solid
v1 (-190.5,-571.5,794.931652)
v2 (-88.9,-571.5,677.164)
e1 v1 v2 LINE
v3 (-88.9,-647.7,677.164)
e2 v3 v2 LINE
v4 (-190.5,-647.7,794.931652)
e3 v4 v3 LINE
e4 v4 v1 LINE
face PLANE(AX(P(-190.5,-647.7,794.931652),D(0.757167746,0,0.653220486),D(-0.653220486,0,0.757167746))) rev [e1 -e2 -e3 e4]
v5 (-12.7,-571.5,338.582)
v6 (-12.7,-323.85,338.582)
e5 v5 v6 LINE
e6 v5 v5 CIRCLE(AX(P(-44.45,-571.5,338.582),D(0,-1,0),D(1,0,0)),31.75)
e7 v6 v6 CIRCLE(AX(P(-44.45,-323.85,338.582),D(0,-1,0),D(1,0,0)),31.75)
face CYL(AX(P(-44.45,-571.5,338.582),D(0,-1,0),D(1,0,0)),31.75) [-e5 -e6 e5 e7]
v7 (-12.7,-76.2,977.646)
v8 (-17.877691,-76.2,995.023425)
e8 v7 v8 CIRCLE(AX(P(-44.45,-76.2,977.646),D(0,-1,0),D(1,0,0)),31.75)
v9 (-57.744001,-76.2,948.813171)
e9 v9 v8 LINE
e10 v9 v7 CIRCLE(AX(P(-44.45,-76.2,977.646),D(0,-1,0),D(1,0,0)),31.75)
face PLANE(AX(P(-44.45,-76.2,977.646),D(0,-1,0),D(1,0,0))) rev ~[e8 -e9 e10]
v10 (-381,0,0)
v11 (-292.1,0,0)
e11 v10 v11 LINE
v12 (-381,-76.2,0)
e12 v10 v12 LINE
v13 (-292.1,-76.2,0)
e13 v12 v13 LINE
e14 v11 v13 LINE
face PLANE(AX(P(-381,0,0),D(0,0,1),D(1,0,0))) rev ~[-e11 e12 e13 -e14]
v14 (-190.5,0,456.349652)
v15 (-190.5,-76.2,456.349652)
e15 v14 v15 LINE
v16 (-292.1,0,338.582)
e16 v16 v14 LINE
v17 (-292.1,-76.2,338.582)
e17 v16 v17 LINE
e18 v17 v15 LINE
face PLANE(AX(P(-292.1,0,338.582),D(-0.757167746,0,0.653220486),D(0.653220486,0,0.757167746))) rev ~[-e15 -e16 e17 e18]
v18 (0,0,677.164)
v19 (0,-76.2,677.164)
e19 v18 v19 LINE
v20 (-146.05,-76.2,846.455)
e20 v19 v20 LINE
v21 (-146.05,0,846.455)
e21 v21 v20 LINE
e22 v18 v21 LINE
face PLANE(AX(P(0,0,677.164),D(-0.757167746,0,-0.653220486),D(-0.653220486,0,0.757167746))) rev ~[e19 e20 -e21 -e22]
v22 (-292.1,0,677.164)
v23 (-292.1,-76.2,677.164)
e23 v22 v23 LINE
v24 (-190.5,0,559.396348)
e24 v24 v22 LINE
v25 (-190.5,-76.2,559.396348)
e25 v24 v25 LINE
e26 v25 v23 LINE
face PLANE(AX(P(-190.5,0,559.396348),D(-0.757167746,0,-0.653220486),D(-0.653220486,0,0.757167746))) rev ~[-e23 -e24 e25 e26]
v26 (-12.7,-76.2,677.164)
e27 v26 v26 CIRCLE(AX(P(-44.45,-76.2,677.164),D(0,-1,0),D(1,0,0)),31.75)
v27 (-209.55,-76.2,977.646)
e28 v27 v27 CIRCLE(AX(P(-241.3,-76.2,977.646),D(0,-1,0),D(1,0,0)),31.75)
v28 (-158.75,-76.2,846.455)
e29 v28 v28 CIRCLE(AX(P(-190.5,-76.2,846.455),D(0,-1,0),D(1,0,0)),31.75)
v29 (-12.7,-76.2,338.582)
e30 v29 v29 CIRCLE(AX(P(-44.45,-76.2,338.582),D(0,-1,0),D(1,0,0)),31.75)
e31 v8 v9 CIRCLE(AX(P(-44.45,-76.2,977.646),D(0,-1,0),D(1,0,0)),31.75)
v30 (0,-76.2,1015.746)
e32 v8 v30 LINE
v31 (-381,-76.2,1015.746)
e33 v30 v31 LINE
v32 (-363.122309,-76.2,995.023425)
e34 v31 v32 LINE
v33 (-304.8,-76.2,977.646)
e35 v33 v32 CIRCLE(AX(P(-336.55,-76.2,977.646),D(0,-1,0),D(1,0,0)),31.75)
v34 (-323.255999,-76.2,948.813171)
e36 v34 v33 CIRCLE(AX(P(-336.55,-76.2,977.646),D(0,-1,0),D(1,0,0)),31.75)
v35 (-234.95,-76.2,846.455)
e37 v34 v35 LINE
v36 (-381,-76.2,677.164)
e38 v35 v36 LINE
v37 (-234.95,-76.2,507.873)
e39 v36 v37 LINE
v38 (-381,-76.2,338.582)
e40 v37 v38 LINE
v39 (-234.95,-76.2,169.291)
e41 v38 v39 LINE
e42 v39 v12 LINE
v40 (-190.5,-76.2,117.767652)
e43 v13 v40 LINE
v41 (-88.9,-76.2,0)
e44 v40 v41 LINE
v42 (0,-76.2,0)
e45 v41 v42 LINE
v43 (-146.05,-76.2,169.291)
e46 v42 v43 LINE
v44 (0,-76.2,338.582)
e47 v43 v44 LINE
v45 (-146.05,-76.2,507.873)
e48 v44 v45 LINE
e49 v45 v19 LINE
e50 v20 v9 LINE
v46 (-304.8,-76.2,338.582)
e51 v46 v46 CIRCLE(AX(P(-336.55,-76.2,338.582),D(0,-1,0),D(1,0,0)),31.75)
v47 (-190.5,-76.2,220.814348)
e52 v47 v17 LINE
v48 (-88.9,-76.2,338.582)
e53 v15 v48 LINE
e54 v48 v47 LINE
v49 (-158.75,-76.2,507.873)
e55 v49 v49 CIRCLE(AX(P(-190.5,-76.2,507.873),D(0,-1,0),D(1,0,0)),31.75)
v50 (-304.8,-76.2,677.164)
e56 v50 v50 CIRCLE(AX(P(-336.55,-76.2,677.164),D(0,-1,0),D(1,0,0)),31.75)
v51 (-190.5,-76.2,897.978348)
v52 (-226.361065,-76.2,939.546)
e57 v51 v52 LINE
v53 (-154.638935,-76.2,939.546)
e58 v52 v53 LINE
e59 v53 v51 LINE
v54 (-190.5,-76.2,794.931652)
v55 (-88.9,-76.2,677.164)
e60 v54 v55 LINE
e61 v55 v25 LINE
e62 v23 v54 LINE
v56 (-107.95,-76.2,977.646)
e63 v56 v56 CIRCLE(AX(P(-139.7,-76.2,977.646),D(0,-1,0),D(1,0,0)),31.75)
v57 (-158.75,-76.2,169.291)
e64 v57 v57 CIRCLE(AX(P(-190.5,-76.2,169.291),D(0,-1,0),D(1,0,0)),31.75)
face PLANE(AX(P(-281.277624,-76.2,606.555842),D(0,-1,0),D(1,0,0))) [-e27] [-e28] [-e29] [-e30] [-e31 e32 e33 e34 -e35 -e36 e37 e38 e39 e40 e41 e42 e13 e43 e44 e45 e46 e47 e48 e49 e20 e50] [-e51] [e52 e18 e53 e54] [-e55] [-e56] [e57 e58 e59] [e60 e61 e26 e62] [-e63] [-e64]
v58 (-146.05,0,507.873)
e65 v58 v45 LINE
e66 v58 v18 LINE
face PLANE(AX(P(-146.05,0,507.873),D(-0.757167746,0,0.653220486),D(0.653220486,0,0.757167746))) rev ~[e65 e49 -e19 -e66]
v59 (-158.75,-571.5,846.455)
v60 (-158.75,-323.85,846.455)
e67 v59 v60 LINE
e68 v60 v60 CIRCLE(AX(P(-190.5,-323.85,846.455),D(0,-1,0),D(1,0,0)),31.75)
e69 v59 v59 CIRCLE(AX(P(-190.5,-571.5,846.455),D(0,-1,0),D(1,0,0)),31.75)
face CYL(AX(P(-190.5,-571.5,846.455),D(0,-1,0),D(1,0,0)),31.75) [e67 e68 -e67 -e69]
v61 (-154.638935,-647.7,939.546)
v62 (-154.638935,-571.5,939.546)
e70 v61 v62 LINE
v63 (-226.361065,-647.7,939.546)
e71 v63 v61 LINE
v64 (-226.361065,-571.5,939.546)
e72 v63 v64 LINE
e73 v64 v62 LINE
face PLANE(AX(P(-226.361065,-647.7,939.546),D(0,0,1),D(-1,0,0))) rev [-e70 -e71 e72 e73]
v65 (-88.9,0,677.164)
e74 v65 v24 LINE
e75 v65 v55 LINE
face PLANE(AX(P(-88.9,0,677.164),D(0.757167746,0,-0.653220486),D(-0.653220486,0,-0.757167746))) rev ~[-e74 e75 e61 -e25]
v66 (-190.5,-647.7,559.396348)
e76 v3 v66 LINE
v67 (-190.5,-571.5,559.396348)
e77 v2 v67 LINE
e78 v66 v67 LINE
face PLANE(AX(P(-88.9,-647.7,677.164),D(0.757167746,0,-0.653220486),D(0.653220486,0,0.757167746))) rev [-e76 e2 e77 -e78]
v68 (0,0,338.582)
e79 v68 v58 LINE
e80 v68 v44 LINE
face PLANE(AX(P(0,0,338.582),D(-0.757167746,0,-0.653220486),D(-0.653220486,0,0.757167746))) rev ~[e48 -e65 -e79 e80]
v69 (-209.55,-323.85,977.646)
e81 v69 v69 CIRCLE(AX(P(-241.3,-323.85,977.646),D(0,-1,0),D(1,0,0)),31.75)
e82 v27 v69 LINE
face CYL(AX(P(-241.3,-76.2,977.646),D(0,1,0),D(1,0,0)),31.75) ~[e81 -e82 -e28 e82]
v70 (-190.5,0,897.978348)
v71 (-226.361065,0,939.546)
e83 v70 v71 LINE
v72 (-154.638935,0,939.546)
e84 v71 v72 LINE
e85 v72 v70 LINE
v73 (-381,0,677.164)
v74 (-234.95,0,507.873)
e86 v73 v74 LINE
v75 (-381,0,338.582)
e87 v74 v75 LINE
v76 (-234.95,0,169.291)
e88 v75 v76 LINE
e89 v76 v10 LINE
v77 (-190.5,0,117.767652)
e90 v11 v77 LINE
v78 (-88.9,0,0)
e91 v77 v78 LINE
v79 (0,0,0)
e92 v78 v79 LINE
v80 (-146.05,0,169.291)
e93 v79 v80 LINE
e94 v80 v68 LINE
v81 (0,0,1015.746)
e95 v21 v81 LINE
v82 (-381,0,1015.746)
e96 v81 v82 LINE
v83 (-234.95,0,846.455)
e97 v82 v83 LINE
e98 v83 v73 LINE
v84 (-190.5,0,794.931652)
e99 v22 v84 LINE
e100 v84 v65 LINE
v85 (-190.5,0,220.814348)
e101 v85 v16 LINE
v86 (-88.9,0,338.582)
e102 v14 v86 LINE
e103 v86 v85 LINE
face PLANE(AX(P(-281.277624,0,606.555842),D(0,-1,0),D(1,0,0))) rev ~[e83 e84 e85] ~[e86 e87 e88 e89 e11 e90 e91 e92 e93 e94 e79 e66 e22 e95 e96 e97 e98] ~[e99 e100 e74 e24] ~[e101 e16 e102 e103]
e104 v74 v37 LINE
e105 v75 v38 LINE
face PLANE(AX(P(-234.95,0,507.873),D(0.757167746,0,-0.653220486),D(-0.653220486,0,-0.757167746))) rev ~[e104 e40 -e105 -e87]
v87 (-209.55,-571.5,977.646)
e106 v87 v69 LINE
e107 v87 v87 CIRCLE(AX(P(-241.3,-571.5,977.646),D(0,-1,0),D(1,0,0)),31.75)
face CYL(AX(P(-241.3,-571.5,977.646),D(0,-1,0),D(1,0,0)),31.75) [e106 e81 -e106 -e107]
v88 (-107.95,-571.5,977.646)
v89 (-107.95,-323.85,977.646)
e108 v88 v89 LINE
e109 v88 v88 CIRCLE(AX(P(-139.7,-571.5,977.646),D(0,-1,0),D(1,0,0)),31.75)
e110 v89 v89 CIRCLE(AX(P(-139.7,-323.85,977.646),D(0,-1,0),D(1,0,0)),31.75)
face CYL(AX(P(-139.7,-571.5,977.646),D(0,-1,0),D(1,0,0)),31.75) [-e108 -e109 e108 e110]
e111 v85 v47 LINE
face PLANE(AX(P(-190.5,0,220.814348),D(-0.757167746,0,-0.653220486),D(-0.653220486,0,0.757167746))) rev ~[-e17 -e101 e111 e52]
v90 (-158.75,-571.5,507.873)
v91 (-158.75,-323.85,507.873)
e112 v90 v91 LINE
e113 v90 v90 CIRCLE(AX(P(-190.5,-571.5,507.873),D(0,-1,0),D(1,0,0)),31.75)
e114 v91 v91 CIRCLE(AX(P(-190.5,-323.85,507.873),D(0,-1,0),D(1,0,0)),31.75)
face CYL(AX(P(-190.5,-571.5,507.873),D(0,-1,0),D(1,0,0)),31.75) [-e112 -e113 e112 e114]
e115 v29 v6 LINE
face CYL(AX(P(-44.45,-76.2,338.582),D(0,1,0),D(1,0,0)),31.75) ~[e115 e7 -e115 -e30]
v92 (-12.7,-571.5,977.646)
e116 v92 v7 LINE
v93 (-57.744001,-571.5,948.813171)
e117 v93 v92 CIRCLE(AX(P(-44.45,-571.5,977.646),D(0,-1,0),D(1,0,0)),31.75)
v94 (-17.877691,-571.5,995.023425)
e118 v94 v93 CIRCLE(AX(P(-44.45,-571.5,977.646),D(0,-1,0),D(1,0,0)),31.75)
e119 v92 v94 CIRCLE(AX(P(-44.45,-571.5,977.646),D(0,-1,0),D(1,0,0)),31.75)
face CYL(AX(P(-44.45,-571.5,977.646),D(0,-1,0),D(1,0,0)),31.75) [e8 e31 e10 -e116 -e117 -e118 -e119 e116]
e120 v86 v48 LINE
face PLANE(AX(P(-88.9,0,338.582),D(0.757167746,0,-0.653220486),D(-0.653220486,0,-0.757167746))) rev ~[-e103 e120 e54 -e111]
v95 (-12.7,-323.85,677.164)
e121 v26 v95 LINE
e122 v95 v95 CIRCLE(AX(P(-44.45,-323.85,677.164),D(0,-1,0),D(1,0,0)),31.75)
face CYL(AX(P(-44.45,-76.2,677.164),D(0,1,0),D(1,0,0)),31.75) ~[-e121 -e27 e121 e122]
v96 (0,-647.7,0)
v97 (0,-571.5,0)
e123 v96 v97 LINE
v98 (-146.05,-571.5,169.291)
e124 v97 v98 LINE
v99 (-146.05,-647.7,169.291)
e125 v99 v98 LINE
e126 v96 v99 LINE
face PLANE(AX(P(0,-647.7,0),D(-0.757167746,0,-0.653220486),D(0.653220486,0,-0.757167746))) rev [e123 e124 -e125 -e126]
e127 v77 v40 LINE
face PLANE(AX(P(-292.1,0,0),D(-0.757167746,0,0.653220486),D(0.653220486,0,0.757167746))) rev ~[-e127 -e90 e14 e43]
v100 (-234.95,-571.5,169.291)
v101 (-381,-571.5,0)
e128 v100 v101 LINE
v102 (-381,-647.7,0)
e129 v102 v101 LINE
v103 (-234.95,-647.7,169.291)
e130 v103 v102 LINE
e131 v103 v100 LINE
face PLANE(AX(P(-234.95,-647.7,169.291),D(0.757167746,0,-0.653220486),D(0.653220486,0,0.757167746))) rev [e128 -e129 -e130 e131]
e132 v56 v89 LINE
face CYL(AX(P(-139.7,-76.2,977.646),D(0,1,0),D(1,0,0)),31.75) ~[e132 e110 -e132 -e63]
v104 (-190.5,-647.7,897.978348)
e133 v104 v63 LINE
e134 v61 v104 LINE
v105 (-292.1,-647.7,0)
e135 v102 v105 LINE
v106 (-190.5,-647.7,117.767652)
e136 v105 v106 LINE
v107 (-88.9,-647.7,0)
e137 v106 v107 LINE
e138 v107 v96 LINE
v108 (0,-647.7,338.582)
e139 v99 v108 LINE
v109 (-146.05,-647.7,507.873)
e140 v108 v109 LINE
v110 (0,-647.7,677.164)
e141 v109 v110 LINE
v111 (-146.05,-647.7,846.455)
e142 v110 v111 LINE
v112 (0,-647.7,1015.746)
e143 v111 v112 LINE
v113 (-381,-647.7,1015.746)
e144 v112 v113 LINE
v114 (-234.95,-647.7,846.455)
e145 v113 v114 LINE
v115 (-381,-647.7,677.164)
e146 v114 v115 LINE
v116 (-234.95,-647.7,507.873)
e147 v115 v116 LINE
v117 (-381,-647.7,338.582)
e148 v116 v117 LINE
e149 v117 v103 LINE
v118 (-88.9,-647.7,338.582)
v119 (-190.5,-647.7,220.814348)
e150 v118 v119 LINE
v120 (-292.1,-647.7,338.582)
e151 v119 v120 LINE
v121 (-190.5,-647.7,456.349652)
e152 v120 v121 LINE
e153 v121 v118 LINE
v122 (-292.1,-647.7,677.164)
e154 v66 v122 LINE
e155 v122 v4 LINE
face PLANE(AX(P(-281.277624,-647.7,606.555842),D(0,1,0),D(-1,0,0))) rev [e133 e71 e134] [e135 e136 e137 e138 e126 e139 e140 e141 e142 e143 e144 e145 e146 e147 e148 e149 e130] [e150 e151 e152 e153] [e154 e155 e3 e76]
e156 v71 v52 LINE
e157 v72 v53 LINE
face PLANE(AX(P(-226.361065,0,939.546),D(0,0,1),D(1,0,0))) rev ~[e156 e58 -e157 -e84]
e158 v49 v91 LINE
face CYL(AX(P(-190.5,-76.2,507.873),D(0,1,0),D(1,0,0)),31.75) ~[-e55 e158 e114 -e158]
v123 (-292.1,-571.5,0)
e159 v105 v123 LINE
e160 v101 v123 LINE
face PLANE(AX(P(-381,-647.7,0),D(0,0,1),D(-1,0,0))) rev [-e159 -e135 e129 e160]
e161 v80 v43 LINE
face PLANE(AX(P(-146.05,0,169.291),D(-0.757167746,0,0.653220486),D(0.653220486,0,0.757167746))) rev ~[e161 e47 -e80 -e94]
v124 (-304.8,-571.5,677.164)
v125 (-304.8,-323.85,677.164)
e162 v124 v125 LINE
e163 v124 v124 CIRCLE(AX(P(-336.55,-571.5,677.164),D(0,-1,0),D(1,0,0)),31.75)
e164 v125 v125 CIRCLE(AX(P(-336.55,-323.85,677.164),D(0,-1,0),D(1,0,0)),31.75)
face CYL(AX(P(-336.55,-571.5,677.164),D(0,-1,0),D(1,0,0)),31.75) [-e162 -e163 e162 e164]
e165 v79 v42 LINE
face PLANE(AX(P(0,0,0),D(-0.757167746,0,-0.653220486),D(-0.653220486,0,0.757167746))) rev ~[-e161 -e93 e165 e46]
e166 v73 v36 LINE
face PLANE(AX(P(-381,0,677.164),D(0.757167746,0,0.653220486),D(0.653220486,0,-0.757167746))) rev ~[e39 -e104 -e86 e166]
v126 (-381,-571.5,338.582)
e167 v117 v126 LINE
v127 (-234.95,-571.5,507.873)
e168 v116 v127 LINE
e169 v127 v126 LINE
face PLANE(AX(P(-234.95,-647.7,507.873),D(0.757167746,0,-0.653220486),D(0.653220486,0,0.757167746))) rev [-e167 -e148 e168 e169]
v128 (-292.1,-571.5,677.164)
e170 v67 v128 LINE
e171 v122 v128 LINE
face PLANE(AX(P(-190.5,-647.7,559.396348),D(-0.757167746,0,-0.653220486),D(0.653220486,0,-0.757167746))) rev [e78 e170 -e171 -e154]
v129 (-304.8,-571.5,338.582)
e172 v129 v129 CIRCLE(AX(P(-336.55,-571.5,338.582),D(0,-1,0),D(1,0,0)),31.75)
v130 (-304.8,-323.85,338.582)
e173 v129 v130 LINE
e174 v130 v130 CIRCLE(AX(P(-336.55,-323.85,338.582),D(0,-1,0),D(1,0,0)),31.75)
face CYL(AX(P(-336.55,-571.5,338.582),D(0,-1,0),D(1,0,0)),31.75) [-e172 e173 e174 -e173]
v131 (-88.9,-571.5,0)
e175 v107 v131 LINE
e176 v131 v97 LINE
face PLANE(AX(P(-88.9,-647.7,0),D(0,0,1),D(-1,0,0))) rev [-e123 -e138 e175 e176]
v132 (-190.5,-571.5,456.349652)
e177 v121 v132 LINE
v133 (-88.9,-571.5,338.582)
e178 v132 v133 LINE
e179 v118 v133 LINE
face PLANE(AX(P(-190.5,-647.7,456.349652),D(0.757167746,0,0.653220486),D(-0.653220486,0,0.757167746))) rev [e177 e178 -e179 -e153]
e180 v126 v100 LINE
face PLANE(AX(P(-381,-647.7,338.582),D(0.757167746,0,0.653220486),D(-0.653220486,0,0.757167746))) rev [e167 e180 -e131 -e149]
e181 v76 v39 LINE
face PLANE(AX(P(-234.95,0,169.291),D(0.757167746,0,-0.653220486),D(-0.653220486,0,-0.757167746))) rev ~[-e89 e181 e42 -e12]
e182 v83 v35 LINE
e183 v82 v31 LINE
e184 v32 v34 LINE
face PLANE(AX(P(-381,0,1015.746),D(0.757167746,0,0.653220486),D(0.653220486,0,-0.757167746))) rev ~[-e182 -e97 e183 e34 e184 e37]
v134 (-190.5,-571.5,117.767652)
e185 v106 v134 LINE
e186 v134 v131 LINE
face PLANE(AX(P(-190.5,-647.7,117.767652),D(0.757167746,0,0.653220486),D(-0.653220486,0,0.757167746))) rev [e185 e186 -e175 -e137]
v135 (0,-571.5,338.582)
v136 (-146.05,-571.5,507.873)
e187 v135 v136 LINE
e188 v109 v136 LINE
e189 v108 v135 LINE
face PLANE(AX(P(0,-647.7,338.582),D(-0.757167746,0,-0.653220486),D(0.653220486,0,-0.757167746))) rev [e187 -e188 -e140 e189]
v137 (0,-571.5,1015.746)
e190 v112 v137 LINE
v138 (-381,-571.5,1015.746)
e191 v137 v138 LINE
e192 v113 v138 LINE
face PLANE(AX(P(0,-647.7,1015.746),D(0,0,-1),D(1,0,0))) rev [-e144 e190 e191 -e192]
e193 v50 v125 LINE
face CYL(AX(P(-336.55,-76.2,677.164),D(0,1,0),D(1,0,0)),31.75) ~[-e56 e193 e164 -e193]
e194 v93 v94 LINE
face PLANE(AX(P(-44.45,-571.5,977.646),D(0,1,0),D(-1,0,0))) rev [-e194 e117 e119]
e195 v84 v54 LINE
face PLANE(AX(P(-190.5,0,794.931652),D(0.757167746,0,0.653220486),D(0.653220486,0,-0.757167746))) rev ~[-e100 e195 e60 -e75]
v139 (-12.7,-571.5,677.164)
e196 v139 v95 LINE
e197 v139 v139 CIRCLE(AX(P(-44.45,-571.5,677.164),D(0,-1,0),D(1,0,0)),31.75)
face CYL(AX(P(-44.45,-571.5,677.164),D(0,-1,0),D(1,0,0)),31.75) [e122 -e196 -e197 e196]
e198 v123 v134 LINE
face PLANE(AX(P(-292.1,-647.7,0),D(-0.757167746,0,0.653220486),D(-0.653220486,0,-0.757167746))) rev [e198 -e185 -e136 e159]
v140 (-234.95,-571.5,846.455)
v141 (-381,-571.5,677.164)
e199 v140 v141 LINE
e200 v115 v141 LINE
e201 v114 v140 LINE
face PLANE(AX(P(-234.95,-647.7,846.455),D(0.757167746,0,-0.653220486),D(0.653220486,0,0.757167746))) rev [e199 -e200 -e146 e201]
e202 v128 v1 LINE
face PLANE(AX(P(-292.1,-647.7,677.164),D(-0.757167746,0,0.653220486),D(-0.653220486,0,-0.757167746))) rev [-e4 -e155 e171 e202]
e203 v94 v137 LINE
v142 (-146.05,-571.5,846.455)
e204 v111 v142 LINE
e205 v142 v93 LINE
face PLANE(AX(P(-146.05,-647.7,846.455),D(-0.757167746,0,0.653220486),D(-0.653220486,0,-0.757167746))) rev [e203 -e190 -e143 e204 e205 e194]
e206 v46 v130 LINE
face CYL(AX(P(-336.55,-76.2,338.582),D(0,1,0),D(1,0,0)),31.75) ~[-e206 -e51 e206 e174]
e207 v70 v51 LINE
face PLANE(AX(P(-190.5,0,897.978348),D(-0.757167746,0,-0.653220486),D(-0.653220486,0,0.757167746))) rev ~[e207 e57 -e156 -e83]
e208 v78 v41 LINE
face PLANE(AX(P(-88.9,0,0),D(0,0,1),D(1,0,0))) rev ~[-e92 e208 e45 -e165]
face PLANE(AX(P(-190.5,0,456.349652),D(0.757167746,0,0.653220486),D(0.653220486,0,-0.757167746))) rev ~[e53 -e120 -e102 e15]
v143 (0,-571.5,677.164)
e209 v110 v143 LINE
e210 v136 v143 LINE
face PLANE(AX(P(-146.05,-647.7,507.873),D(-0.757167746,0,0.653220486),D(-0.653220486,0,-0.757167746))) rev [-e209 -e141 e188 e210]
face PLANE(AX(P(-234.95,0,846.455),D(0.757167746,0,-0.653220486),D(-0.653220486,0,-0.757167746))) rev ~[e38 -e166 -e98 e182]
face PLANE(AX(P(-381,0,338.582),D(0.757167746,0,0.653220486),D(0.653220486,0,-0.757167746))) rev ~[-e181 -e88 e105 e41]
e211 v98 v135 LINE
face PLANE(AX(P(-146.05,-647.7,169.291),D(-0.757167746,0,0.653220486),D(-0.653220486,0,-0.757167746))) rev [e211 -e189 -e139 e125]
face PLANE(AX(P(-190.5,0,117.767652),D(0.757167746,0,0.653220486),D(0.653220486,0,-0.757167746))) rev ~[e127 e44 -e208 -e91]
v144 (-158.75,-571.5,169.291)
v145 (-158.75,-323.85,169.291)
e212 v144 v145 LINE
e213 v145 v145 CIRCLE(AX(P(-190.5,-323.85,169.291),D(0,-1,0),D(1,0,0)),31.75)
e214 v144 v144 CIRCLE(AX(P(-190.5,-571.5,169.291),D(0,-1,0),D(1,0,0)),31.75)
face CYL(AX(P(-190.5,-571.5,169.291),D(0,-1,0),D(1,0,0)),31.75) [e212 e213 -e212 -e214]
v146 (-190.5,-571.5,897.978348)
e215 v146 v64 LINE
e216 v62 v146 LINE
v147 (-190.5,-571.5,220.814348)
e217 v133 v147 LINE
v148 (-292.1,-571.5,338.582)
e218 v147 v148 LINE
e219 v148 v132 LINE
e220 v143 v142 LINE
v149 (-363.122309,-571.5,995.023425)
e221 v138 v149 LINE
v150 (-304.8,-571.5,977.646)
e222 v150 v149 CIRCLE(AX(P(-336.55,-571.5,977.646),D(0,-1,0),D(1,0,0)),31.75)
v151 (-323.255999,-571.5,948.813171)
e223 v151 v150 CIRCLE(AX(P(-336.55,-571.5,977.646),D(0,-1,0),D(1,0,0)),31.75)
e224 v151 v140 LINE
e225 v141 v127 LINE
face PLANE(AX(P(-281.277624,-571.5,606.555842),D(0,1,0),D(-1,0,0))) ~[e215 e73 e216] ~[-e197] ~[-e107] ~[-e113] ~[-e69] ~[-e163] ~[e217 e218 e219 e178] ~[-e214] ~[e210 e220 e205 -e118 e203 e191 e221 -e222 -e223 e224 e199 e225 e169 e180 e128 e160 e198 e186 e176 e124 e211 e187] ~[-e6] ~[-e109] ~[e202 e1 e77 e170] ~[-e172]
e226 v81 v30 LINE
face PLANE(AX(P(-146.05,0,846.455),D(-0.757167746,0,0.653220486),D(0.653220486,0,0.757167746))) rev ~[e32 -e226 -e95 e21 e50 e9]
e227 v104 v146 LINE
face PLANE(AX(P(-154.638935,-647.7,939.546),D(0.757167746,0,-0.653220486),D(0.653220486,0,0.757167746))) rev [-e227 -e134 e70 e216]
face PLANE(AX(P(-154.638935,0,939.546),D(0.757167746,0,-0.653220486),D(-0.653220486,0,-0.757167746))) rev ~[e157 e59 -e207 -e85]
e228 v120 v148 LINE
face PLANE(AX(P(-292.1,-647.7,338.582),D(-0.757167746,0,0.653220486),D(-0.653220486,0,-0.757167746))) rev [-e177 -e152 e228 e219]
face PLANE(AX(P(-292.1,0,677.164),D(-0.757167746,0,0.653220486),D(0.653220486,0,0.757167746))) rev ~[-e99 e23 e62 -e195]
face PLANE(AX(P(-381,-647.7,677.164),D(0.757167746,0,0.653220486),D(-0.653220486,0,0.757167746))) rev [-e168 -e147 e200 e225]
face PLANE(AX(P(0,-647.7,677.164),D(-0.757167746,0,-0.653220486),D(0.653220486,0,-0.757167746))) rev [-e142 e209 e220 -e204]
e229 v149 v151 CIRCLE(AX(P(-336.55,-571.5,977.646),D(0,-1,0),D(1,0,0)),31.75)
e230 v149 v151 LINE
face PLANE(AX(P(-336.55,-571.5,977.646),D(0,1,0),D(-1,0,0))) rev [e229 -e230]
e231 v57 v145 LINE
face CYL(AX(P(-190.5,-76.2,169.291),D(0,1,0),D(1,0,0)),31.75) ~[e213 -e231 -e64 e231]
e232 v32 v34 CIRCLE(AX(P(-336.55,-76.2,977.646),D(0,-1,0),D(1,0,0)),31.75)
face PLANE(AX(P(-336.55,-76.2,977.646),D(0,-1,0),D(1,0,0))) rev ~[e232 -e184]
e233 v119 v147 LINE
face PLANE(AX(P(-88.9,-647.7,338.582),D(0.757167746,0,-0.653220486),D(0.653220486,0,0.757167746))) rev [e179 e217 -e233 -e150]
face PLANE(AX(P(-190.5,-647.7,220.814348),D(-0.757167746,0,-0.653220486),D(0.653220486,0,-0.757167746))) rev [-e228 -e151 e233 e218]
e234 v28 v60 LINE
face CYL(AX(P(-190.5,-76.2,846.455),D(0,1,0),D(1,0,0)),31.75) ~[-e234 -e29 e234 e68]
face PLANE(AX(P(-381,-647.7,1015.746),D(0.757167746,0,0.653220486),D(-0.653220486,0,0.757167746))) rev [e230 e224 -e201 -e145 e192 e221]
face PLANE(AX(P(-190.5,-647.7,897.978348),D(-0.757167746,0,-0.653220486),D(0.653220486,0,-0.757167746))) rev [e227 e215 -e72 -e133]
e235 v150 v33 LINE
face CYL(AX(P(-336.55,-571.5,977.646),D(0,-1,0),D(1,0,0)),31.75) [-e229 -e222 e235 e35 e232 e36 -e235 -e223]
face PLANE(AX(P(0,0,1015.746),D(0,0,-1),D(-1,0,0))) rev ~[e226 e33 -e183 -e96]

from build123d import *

# Parameters (mm, degrees)
F1_DEPTH = 76.2
F2_R     = 31.75
F3_DEPTH = 247.65


# Not quite as in the source:
# - a feature names something its author has since deleted; it is built from what else it names


with BuildPart() as f1:
    # F0 (on Front) → F1 (new body)
    with BuildSketch(Plane.XZ):
        Polygon((-234.95, 507.873), (-190.5, 559.3963478261), (-292.1, 677.164), (-381, 677.164), align=None)
        Polygon((-190.5, 456.3496521739), (-146.05, 507.873), (-190.5, 559.3963478261), (-234.95, 507.873), align=None)
        Polygon((-190.5, 559.3963478261), (-146.05, 507.873), (0, 677.164), (-88.9, 677.164), align=None)
        Polygon((-88.9, 338.582), (0, 338.582), (-146.05, 507.873), (-190.5, 456.3496521739), align=None)
        Polygon((-381, 338.582), (-292.1, 338.582), (-190.5, 456.3496521739), (-234.95, 507.873), align=None)
        Polygon((-234.95, 169.291), (-190.5, 220.8143478261), (-292.1, 338.582), (-381, 338.582), align=None)
        Polygon((-190.5, 220.8143478261), (-146.05, 169.291), (0, 338.582), (-88.9, 338.582), align=None)
        Polygon((-190.5, 117.7676521739), (-146.05, 169.291), (-190.5, 220.8143478261), (-234.95, 169.291), align=None)
        Polygon((-88.9, 0), (0, 0), (-146.05, 169.291), (-190.5, 117.7676521739), align=None)
        Polygon((-292.1, 0), (-190.5, 117.7676521739), (-234.95, 169.291), (-381, 0), align=None)
        Polygon((-381, 677.164), (-292.1, 677.164), (-190.5, 794.9316521739), (-234.95, 846.455), align=None)
        Polygon((-190.5, 794.9316521739), (-146.05, 846.455), (-190.5, 897.9783478261), (-234.95, 846.455), align=None)
        Polygon((-88.9, 677.164), (0, 677.164), (-146.05, 846.455), (-190.5, 794.9316521739), align=None)
        Polygon((-190.5, 897.9783478261), (-146.05, 846.455), (0, 1015.746), (-88.9, 1015.746), (-154.6389347337, 939.546), align=None)
        Polygon((-154.6389347337, 939.546), (-88.9, 1015.746), (-292.1, 1015.746), (-226.3610652663, 939.546), align=None)
        Polygon((-234.95, 846.455), (-190.5, 897.9783478261), (-226.3610652663, 939.546), (-292.1, 1015.746), (-381, 1015.746), align=None)
    extrude(amount=F1_DEPTH)

    # F2 (on face) → F3 (join)
    with BuildSketch(Plane.XZ.offset(76.2)):
        with Locations((-336.55, 677.164)):
            Circle(F2_R)
        with Locations((-44.45, 677.164)):
            Circle(F2_R)
        with Locations((-190.5, 507.873)):
            Circle(F2_R)
        with Locations((-190.5, 169.291)):
            Circle(F2_R)
        with Locations((-44.45, 338.582)):
            Circle(F2_R)
        with Locations((-336.55, 338.582)):
            Circle(F2_R)
        with Locations((-190.5, 846.455)):
            Circle(F2_R)
        with Locations((-44.45, 977.646)):
            Circle(F2_R)
        with Locations((-139.7, 977.646)):
            Circle(F2_R)
        with Locations((-336.55, 977.646)):
            Circle(F2_R)
        with Locations((-241.3, 977.646)):
            Circle(F2_R)
    extrude(amount=F3_DEPTH)

    # F4: F1 across face


with BuildPart() as f1_1:
    add(f1.part)
    add(f1.part.mirror(Plane(origin=(-336.55, -323.85, 977.646), x_dir=(1, 0, 0), z_dir=(0, -1, 0))))


solid = f1_1.part
